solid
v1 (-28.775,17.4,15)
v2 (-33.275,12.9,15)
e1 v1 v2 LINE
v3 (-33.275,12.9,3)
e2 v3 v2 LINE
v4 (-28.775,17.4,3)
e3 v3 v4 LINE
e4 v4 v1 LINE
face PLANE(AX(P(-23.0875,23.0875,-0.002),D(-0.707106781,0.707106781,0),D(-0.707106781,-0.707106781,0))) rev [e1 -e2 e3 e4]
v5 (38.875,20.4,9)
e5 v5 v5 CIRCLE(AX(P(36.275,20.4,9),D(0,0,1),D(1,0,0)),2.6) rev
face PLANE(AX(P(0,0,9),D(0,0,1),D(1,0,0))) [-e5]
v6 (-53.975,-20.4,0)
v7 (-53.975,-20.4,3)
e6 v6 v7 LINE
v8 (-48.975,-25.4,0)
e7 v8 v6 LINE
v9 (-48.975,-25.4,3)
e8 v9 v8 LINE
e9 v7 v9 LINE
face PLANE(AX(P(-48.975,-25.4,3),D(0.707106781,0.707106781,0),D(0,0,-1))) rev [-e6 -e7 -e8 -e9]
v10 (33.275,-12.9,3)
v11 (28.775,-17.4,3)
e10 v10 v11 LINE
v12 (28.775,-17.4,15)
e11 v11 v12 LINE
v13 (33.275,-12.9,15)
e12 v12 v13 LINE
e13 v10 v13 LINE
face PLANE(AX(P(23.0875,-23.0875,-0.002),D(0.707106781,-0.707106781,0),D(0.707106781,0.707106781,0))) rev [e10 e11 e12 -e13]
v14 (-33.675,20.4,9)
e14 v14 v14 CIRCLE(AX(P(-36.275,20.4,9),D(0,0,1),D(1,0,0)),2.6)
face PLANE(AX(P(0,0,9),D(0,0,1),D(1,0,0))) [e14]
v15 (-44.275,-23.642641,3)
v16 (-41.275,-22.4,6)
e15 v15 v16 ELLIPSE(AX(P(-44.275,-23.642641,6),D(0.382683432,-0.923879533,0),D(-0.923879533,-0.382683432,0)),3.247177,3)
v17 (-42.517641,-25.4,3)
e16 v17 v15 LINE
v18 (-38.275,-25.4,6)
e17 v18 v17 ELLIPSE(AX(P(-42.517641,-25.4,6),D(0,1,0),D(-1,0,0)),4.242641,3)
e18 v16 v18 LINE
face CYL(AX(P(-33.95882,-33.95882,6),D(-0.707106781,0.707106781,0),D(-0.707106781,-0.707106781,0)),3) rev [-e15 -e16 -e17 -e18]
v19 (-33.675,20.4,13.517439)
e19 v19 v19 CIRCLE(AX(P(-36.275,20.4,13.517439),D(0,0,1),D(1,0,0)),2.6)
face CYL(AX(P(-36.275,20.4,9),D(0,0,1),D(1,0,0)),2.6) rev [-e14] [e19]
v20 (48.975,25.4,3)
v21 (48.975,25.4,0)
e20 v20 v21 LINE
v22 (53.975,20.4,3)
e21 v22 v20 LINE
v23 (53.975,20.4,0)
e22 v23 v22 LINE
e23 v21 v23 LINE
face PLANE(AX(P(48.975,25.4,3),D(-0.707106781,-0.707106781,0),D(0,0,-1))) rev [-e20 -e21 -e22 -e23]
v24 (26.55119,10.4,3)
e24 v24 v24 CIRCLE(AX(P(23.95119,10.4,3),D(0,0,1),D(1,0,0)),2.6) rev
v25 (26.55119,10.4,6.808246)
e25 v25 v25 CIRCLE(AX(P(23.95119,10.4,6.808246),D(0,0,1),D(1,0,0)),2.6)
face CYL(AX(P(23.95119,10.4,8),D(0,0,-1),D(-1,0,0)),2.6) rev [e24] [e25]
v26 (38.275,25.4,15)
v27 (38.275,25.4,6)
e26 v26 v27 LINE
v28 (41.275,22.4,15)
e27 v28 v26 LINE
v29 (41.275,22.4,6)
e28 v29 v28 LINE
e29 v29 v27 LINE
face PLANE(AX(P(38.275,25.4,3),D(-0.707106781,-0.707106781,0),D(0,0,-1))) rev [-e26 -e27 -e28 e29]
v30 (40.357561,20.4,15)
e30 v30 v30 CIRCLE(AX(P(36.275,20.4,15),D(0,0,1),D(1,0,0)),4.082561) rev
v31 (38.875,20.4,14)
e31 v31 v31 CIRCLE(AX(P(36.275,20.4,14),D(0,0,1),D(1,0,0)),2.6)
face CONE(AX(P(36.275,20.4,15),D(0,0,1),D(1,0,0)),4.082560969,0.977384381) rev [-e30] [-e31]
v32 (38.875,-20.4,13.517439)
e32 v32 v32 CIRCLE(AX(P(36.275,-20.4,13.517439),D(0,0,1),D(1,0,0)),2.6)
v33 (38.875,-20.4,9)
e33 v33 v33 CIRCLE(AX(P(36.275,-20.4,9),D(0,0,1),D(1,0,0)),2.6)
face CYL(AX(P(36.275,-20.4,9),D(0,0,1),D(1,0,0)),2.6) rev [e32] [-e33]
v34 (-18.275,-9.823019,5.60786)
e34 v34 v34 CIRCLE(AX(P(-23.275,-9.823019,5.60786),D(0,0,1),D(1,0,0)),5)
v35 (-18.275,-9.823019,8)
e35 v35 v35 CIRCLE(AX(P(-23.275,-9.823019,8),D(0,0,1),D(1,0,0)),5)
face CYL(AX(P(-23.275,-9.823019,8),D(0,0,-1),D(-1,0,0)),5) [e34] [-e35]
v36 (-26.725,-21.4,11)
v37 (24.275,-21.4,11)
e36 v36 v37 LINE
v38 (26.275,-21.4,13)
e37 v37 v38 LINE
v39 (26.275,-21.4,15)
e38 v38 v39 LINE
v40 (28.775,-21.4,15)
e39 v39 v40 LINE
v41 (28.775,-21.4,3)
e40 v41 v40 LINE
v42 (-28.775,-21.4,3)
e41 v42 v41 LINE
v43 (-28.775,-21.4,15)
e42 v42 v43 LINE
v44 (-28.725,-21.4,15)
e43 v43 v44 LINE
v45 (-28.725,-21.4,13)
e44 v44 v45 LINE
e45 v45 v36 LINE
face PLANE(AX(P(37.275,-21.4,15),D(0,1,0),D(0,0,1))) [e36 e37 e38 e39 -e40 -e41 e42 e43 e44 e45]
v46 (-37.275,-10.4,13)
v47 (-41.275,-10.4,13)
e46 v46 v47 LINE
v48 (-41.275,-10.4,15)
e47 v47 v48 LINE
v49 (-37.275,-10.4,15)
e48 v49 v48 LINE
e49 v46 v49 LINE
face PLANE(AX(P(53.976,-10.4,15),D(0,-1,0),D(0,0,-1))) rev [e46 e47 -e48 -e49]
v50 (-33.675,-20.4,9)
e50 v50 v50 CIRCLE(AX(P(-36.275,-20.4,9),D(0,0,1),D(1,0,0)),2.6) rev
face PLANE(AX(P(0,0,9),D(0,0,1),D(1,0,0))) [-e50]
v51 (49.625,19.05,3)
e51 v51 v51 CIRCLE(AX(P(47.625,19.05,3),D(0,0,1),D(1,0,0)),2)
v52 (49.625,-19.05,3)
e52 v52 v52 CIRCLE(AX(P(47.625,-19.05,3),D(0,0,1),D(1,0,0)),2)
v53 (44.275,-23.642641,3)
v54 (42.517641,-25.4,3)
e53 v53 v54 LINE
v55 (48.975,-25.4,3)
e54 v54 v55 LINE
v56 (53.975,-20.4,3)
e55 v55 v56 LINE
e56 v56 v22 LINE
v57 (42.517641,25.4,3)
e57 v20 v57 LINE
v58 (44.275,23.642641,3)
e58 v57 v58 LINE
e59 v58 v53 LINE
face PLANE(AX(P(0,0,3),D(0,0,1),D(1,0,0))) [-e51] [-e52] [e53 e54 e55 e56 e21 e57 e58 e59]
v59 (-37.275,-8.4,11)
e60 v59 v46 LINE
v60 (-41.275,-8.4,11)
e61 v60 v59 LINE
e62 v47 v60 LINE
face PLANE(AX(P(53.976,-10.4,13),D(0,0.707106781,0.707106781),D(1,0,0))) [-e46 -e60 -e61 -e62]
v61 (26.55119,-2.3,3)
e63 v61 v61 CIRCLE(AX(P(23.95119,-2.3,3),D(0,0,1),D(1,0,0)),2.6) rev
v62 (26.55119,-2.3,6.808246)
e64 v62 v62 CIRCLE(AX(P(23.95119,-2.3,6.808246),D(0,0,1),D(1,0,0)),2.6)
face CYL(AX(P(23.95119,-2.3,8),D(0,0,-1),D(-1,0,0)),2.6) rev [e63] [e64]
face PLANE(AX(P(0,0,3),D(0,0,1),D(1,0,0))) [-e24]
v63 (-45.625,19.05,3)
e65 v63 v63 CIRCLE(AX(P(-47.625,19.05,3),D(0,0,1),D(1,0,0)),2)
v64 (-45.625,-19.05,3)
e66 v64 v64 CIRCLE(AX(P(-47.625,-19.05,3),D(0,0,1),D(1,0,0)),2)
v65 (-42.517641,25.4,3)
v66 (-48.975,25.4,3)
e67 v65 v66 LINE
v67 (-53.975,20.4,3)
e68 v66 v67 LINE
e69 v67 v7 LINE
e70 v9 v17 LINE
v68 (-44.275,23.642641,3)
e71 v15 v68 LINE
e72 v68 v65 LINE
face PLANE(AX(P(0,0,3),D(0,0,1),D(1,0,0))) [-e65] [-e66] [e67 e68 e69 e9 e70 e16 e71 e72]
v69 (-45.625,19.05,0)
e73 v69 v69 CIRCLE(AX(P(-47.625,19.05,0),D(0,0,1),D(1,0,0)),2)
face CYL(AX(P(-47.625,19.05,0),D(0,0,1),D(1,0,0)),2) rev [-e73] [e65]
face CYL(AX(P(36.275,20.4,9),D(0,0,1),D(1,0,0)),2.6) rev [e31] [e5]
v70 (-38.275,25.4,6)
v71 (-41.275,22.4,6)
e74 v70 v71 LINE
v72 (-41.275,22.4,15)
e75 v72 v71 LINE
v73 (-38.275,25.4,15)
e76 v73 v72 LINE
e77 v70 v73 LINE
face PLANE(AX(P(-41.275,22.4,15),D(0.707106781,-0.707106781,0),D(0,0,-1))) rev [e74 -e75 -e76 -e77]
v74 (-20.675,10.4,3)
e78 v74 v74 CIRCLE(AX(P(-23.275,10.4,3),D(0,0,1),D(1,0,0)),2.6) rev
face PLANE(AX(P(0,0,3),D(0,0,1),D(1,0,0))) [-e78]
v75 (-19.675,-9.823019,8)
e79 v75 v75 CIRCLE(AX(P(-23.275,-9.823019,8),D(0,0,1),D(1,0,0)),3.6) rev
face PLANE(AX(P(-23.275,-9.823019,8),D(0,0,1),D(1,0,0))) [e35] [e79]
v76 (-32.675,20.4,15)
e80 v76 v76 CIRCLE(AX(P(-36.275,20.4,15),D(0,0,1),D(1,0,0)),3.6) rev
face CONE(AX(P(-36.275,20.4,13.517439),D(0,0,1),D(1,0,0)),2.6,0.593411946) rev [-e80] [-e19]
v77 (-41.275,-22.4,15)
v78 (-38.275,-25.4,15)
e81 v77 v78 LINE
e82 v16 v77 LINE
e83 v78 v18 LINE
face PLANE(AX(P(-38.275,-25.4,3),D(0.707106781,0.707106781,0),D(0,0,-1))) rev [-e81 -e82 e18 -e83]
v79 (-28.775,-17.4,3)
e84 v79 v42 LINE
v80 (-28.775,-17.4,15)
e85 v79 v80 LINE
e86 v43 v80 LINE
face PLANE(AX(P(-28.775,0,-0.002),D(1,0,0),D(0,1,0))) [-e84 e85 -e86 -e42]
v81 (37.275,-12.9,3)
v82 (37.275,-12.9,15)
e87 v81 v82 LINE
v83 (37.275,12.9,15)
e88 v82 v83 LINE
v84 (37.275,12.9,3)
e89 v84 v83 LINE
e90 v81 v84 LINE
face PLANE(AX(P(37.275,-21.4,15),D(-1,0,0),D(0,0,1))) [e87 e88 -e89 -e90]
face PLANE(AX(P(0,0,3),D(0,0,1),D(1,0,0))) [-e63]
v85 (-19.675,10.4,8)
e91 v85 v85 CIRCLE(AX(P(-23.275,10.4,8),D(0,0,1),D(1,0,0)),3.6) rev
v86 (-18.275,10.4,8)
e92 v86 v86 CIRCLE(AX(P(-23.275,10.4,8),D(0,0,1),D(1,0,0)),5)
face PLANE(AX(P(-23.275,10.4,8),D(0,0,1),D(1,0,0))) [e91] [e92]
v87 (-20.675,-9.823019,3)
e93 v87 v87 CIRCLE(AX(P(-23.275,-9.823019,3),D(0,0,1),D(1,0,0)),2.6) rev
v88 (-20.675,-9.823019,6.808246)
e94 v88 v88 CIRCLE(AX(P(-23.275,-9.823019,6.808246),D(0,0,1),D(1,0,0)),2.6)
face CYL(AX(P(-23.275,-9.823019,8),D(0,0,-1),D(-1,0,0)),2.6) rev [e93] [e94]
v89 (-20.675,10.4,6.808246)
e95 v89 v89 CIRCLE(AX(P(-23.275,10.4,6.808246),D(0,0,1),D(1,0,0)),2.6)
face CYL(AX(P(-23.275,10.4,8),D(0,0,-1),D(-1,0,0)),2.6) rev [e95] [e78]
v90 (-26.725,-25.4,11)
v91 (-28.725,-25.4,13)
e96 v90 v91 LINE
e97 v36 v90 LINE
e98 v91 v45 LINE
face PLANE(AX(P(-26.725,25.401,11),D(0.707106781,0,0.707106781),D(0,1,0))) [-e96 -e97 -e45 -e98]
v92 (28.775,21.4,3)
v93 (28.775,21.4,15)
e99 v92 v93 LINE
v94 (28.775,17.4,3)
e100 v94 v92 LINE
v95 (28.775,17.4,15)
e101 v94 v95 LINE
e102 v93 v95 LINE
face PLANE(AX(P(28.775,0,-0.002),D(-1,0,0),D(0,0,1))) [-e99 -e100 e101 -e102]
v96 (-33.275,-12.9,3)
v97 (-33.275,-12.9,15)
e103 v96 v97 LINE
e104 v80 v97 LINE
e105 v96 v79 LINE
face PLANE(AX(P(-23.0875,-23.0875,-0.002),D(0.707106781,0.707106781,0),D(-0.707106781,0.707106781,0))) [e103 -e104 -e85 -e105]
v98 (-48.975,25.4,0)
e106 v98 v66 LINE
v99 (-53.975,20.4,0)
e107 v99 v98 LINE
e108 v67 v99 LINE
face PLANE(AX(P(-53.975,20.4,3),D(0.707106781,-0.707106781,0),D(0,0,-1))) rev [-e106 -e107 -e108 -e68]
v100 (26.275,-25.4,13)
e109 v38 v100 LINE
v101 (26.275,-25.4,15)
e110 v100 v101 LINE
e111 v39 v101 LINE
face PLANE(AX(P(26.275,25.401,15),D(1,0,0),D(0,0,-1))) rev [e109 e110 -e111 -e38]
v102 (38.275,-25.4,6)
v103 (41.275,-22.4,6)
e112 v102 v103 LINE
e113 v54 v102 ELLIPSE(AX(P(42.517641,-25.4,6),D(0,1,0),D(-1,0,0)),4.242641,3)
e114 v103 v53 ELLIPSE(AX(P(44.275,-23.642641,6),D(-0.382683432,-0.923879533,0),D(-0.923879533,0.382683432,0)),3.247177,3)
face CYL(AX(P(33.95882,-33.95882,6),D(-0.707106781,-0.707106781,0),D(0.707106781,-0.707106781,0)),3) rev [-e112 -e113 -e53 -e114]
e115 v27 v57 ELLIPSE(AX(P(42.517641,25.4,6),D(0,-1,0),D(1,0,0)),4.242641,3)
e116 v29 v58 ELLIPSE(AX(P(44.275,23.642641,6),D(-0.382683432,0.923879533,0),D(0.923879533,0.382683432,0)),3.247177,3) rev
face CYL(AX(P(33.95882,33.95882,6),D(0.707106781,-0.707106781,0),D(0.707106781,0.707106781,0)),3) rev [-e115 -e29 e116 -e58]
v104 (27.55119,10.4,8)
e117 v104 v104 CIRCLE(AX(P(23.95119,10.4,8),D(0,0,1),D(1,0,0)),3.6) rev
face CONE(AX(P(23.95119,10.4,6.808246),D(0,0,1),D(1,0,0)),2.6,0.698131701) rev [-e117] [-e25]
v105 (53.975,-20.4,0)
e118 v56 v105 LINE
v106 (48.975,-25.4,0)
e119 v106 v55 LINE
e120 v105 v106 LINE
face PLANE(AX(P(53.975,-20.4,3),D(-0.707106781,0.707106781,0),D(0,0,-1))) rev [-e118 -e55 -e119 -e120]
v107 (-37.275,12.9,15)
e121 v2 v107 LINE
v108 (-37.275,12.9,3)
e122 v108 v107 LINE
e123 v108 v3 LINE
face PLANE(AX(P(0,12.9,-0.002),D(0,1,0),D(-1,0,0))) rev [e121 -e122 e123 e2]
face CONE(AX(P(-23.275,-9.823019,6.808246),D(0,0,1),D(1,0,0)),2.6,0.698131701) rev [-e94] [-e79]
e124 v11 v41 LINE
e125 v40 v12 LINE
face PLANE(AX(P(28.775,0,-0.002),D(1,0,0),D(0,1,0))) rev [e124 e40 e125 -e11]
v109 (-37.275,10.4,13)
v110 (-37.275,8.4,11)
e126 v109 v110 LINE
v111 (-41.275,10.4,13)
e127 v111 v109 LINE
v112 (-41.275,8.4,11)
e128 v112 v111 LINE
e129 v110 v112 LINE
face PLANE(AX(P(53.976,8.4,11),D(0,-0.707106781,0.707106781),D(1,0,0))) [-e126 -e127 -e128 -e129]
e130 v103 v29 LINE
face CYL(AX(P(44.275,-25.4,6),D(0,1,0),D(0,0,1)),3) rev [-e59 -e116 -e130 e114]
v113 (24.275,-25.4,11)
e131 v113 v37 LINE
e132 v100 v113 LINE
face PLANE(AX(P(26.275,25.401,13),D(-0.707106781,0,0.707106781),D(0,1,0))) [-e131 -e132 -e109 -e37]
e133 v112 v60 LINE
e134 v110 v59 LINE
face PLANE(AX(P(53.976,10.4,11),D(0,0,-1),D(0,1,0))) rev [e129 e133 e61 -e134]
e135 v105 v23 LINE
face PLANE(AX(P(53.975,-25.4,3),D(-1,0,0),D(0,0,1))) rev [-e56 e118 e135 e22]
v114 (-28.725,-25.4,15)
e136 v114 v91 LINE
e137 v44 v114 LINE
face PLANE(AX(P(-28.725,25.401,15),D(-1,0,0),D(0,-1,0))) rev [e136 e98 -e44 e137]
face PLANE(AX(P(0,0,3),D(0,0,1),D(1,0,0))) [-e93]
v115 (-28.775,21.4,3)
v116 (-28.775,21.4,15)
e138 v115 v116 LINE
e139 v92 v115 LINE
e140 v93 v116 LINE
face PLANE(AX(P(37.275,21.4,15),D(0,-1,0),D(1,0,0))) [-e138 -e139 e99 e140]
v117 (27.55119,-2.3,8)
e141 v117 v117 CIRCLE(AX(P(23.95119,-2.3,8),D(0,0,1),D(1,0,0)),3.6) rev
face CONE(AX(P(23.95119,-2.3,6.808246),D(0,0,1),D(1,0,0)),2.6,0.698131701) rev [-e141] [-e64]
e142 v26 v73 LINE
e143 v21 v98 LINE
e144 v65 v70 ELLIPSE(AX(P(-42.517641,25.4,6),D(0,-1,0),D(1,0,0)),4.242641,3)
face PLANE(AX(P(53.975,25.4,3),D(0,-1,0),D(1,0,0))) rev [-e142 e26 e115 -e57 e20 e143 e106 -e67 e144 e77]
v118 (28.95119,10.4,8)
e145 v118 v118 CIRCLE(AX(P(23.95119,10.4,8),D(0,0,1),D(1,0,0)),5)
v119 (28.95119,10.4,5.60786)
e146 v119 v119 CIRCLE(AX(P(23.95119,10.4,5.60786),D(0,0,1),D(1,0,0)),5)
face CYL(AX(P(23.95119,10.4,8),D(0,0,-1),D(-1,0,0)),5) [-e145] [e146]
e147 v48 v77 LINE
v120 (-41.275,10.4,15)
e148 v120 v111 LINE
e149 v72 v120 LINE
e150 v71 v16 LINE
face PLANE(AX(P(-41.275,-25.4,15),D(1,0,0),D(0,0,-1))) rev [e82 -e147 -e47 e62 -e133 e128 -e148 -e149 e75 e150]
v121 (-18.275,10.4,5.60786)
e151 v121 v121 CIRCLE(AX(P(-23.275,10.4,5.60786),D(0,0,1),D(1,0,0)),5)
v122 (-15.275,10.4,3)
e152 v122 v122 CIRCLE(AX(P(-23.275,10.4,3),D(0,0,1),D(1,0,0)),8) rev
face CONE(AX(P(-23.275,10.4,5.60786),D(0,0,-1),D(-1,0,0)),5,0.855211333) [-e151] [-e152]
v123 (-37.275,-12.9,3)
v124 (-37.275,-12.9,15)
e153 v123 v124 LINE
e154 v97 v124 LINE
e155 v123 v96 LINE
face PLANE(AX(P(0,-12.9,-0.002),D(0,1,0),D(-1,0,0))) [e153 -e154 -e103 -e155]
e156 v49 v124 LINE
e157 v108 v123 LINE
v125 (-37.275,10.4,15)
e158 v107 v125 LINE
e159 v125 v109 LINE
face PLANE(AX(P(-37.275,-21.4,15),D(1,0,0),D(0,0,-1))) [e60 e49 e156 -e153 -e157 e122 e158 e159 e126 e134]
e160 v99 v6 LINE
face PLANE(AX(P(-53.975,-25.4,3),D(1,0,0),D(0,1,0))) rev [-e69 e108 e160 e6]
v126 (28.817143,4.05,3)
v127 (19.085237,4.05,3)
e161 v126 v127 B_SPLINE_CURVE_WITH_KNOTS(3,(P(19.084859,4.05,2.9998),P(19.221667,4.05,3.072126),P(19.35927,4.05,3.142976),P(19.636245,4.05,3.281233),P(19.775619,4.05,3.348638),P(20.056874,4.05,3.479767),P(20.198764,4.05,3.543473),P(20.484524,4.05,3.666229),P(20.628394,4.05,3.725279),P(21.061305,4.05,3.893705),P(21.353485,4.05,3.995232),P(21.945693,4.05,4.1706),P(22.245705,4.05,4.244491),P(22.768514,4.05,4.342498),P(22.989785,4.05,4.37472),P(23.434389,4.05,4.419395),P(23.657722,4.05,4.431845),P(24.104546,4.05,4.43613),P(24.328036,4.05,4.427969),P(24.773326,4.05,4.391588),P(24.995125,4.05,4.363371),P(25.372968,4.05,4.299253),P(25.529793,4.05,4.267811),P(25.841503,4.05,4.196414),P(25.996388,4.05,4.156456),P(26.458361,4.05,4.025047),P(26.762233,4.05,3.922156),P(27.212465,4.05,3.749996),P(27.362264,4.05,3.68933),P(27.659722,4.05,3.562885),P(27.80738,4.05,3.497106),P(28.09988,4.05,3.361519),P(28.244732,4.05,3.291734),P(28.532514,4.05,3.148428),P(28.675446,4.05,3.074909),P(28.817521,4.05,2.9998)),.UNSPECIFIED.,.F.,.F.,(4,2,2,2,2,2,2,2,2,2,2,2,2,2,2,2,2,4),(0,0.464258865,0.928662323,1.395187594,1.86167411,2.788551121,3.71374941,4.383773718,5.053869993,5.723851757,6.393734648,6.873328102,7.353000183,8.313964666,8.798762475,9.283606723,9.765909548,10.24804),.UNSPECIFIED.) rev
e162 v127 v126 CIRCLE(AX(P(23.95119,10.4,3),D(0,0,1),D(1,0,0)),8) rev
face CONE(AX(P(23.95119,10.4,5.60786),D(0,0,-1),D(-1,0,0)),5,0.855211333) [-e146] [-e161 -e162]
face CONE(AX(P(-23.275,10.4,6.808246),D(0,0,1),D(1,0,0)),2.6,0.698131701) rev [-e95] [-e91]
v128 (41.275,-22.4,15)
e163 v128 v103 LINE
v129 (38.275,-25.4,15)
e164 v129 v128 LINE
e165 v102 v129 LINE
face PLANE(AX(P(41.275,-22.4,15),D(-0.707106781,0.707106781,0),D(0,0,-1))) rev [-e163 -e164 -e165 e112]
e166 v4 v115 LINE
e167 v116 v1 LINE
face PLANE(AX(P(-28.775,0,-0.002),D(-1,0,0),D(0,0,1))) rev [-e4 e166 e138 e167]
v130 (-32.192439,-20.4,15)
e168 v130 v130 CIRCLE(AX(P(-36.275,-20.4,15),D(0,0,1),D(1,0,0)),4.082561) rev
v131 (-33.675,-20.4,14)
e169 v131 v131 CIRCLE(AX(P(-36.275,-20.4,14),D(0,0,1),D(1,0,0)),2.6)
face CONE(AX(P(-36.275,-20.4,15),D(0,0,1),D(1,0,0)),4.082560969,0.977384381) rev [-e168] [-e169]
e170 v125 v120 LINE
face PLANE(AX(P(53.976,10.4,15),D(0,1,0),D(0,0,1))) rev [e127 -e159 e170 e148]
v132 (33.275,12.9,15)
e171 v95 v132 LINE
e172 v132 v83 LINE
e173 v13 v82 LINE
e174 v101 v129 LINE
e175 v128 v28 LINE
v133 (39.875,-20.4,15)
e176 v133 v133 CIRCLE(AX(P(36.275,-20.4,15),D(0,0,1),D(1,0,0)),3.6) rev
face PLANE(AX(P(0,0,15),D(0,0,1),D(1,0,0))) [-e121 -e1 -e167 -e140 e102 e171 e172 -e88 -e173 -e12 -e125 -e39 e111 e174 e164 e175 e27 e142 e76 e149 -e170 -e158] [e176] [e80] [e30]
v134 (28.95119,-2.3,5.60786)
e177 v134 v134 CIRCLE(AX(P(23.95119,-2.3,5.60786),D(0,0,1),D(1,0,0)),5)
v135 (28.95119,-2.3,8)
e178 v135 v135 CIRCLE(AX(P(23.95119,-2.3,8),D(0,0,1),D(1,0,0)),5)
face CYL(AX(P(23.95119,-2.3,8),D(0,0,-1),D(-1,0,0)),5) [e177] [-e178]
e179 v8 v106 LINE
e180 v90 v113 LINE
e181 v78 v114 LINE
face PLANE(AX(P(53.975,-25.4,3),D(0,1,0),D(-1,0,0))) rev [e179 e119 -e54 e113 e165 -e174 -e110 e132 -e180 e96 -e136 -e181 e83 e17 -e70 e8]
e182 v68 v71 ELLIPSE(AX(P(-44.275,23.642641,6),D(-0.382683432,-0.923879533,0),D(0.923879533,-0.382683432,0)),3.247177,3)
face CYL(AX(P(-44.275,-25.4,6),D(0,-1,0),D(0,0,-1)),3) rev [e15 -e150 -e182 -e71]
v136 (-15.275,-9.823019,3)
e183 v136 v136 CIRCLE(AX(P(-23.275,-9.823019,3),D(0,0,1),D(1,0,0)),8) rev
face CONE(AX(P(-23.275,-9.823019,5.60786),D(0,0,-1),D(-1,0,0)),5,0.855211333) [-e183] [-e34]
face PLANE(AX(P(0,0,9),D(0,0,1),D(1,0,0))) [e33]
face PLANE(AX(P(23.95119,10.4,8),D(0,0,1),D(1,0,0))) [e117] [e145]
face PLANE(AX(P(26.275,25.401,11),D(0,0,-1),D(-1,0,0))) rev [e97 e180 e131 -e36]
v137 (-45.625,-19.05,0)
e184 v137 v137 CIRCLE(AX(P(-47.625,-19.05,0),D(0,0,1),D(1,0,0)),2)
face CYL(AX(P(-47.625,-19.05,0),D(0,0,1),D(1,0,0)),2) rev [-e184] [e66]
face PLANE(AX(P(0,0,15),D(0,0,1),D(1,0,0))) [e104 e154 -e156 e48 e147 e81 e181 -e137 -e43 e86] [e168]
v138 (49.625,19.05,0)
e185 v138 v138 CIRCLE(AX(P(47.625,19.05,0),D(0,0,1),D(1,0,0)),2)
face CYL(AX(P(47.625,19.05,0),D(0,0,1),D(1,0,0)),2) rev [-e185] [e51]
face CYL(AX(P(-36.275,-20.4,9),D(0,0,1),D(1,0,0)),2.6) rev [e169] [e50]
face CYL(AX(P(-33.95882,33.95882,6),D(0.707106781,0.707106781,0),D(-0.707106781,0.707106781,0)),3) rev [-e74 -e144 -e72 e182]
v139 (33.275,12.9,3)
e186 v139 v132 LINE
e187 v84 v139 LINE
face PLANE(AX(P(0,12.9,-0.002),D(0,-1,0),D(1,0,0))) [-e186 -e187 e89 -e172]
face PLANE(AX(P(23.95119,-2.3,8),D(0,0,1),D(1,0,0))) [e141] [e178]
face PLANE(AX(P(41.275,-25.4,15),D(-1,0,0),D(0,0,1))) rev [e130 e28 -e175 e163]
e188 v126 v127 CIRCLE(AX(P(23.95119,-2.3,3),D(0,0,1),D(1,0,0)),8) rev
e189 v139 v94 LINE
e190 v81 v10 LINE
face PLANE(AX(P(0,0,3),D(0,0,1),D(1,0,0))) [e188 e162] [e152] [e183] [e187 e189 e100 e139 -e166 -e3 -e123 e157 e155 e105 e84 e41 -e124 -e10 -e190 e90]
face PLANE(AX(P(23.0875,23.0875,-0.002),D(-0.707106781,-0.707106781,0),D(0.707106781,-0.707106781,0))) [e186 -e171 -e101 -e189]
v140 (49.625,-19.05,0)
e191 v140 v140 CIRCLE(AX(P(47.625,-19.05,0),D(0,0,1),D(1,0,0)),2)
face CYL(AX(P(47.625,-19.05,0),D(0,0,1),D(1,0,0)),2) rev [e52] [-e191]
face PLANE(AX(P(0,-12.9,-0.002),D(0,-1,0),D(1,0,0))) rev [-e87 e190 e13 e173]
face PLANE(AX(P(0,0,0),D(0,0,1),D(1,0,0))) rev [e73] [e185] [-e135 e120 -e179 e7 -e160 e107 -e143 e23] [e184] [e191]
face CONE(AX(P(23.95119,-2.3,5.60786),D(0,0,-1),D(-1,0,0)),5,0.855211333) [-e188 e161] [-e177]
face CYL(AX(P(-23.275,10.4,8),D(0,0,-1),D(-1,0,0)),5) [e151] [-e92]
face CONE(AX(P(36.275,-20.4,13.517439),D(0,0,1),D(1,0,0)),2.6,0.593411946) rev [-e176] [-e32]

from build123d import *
from OCP.BRepFilletAPI import BRepFilletAPI_MakeChamfer

# Parameters (mm, degrees)
SKETCH1_W           = 107.95
SKETCH1_H           = 50.8
BOSS_EXTRUDE1_DEPTH = 3
SKETCH2_W           = 82.55
SKETCH2_H           = 50.8
SKETCH2_W_2         = 74.55
SKETCH2_H_2         = 42.8
BOSS_EXTRUDE2_DEPTH = 12
SKETCH3_R           = 5
SKETCH3_R_2         = 2.6
BOSS_EXTRUDE3_DEPTH = 5
CUT_EXTRUDE1_REACH  = 77.624
SKETCH4_W           = 55
SKETCH4_H           = 4
CUT_EXTRUDE2_REACH  = 101.713
SKETCH5_W           = 4
SKETCH5_H           = 20.8
SKETCH6_R           = 2.5
BOSS_EXTRUDE4_DEPTH = 12
CHAMFER1_SIZE       = 3
CHAMFER2_SIZE       = 3
CHAMFER2_SIZE_2     = 2.607860213
CHAMFER3_SIZE       = 1
CHAMFER3_SIZE2      = 1.191753593
SKETCH7_R           = 2.6
CUT_EXTRUDE3_DEPTH  = 6
CHAMFER4_SIZE       = 2
SKETCH8_R           = 2
CUT_EXTRUDE4_DEPTH  = 61.847848154
CHAMFER5_SIZE       = 5
FILLET1_R           = 3
CHAMFER6_SIZE       = 1
CHAMFER6_SIZE2      = 1.482560969


with BuildPart() as part:
    # Sketch1 → Boss-Extrude1 (new body)
    with BuildSketch(Plane.XY):
        Rectangle(SKETCH1_W, SKETCH1_H)
    extrude(amount=BOSS_EXTRUDE1_DEPTH)

    # Sketch2 → Boss-Extrude2 (add)
    with BuildSketch(Plane.XY.offset(3)):
        Rectangle(SKETCH2_W, SKETCH2_H)
        Rectangle(SKETCH2_W_2, SKETCH2_H_2, mode=Mode.SUBTRACT)
    extrude(amount=BOSS_EXTRUDE2_DEPTH)

    # Sketch3 → Boss-Extrude3 (add)
    # profile 1 of 4: a face of its own
    with BuildSketch(Plane.XY.offset(3)):
        with Locations((-23.275, 10.4)):
            Circle(SKETCH3_R)
        with Locations((-23.275, 10.4)):
            Circle(SKETCH3_R_2, mode=Mode.SUBTRACT)
    # profile 2 of 4: a face of its own
    with BuildSketch(Plane.XY.offset(3)):
        with Locations((-23.275, -9.823019498)):
            Circle(SKETCH3_R)
        with Locations((-23.275, -9.823019498)):
            Circle(SKETCH3_R_2, mode=Mode.SUBTRACT)
    # profile 3 of 4: a face of its own
    with BuildSketch(Plane.XY.offset(3)):
        with Locations((23.951190028, 10.4)):
            Circle(SKETCH3_R)
        with Locations((23.951190028, 10.4)):
            Circle(SKETCH3_R_2, mode=Mode.SUBTRACT)
    # profile 4 of 4: a face of its own
    with BuildSketch(Plane.XY.offset(3)):
        with Locations((23.951190028, -2.3)):
            Circle(SKETCH3_R)
        with Locations((23.951190028, -2.3)):
            Circle(SKETCH3_R_2, mode=Mode.SUBTRACT)
    extrude(amount=BOSS_EXTRUDE3_DEPTH)

    # Sketch4 → Cut-Extrude1 (cut, up to next)
    with BuildSketch(Plane.XZ.offset(25.4), mode=Mode.PRIVATE) as cut_extrude1_sk1:
        with Locations((-1.225, 13)):
            Rectangle(SKETCH4_W, SKETCH4_H)
    cut_extrude1_tool1 = extrude(cut_extrude1_sk1.sketch, amount=-CUT_EXTRUDE1_REACH, mode=Mode.PRIVATE) & part.part
    add(cut_extrude1_tool1.solids().sort_by_distance((-1.225, -25.4, 13))[0], mode=Mode.SUBTRACT)

    # Sketch5 → Cut-Extrude2 (cut, up to next)
    with BuildSketch(Plane.ZY.offset(41.275), mode=Mode.PRIVATE) as cut_extrude2_sk1:
        with Locations((13, 0)):
            Rectangle(SKETCH5_W, SKETCH5_H)
    cut_extrude2_tool1 = extrude(cut_extrude2_sk1.sketch, amount=-CUT_EXTRUDE2_REACH, mode=Mode.PRIVATE) & part.part
    add(cut_extrude2_tool1.solids().sort_by_distance((-41.275, 0, 13))[0], mode=Mode.SUBTRACT)

    # Sketch6 → Boss-Extrude4 (add)
    with BuildSketch(Plane.XY.offset(15)):
        with BuildLine():
            Line((-33.275, 12.9), (-28.775, 17.4))
            Line((-28.775, 17.4), (-28.775, 21.4))
            Line((-28.775, 21.4), (-33.983712153, 21.4))
            ThreePointArc((-33.983712153, 21.4), (-33.827734218, 20.910774109), (-33.775, 20.4))
            ThreePointArc((-33.775, 20.4), (-34.905693606, 18.308349934), (-37.275, 18.108712153))
            Line((-37.275, 18.108712153), (-37.275, 12.9))
            Line((-37.275, 12.9), (-33.275, 12.9))
        make_face()
        with Locations((-36.275, -20.4)):
            Circle(SKETCH6_R)
        Polygon((-37.275, -12.9), (-37.275, -21.4), (-28.775, -21.4), (-28.775, -17.4), (-33.275, -12.9), align=None)
        with BuildLine():
            Line((37.275, -18.108712153), (37.275, -12.9))
            Line((37.275, -12.9), (33.275, -12.9))
            Line((33.275, -12.9), (28.775, -17.4))
            Line((28.775, -17.4), (28.775, -21.4))
            Line((28.775, -21.4), (33.983712153, -21.4))
            ThreePointArc((33.983712153, -21.4), (34.507233047, -18.632233047), (37.275, -18.108712153))
        make_face()
        with BuildLine():
            Line((33.983712153, 21.4), (28.775, 21.4))
            Line((28.775, 21.4), (28.775, 17.4))
            Line((28.775, 17.4), (33.275, 12.9))
            Line((33.275, 12.9), (37.275, 12.9))
            Line((37.275, 12.9), (37.275, 18.108712153))
            ThreePointArc((37.275, 18.108712153), (34.507233047, 18.632233047), (33.983712153, 21.4))
        make_face()
        with BuildLine():
            ThreePointArc((-33.775, 20.4), (-33.827734218, 20.910774109), (-33.983712153, 21.4))
            Line((-33.983712153, 21.4), (-37.275, 21.4))
            Line((-37.275, 21.4), (-37.275, 18.108712153))
            ThreePointArc((-37.275, 18.108712153), (-34.905693606, 18.308349934), (-33.775, 20.4))
        make_face()
        with BuildLine():
            Line((-37.275, 21.4), (-33.983712153, 21.4))
            ThreePointArc((-33.983712153, 21.4), (-38.042766953, 22.167766953), (-37.275, 18.108712153))
            Line((-37.275, 18.108712153), (-37.275, 21.4))
        make_face()
        with BuildLine():
            ThreePointArc((-37.275, -18.108712153), (-38.042766953, -22.167766953), (-33.983712153, -21.4))
            Line((-33.983712153, -21.4), (-37.275, -21.4))
            Line((-37.275, -21.4), (-37.275, -18.108712153))
        make_face()
        with BuildLine():
            Line((-37.275, -21.4), (-33.983712153, -21.4))
            ThreePointArc((-33.983712153, -21.4), (-33.827734218, -20.910774109), (-33.775, -20.4))
            ThreePointArc((-33.775, -20.4), (-34.905693606, -18.308349934), (-37.275, -18.108712153))
            Line((-37.275, -18.108712153), (-37.275, -21.4))
        make_face()
        with BuildLine():
            ThreePointArc((38.775, 20.4), (36.785774109, 22.847265782), (33.983712153, 21.4))
            Line((33.983712153, 21.4), (37.275, 21.4))
            Line((37.275, 21.4), (37.275, 18.108712153))
            ThreePointArc((37.275, 18.108712153), (38.366650066, 19.030693606), (38.775, 20.4))
        make_face()
        with BuildLine():
            Line((37.275, 21.4), (33.983712153, 21.4))
            ThreePointArc((33.983712153, 21.4), (34.507233047, 18.632233047), (37.275, 18.108712153))
            Line((37.275, 18.108712153), (37.275, 21.4))
        make_face()
        with BuildLine():
            ThreePointArc((38.775, -20.4), (38.366650066, -19.030693606), (37.275, -18.108712153))
            Line((37.275, -18.108712153), (37.275, -21.4))
            Line((37.275, -21.4), (33.983712153, -21.4))
            ThreePointArc((33.983712153, -21.4), (36.785774109, -22.847265782), (38.775, -20.4))
        make_face()
        with BuildLine():
            Line((37.275, -21.4), (37.275, -18.108712153))
            ThreePointArc((37.275, -18.108712153), (34.507233047, -18.632233047), (33.983712153, -21.4))
            Line((33.983712153, -21.4), (37.275, -21.4))
        make_face()
    extrude(amount=-BOSS_EXTRUDE4_DEPTH)

    # Chamfer1
    chamfer1_edges = [part.edges().sort_by_distance(p)[0] for p in [
        (-41.275, 25.4, 9),
        (-41.275, -25.4, 9),
        (41.275, -25.4, 9),
        (41.275, 25.4, 9),
    ]]
    chamfer(chamfer1_edges, length=CHAMFER1_SIZE)

    # Chamfer2
    # the kernel refuses this chamfer: 3, 2.607860213 mm, written as the material it adds along each edge
    with BuildSketch(Plane(origin=(-23.275, 10.4, 3), x_dir=(1, 0, 0), z_dir=(0, -1, 0))) as chamfer2_piece_1:
        Polygon((5 + CHAMFER2_SIZE, 0), (5, CHAMFER2_SIZE_2), (5, 0), align=None)
    revolve(axis=Axis((-23.275, 10.4, 3), (0, 0, 1)))
    with BuildSketch(Plane(origin=(-23.275, -9.823019498, 3), x_dir=(1, 0, 0), z_dir=(0, -1, 0))) as chamfer2_piece_2:
        Polygon((5 + CHAMFER2_SIZE, 0), (5, CHAMFER2_SIZE_2), (5, 0), align=None)
    revolve(axis=Axis((-23.275, -9.823019498, 3), (0, 0, 1)))
    with BuildSketch(Plane(origin=(23.951190028, 10.4, 3), x_dir=(1, 0, 0), z_dir=(0, -1, 0))) as chamfer2_piece_3:
        Polygon((5 + CHAMFER2_SIZE, 0), (5, CHAMFER2_SIZE_2), (5, 0), align=None)
    revolve(axis=Axis((23.951190028, 10.4, 3), (0, 0, 1)))
    with BuildSketch(Plane(origin=(23.951190028, -2.3, 3), x_dir=(1, 0, 0), z_dir=(0, -1, 0))) as chamfer2_piece_4:
        Polygon((5 + CHAMFER2_SIZE, 0), (5, CHAMFER2_SIZE_2), (5, 0), align=None)
    revolve(axis=Axis((23.951190028, -2.3, 3), (0, 0, 1)))

    # Chamfer3: one chamfer whose edges measure the first distance from different faces: ONE call of the kernel's chamfer builder (chamfer() names one face for all edges)
    chamfer3_edges_1 = [part.edges().sort_by_distance(p)[0] for p in [
        (-25.875, 10.4, 8),
    ]]
    chamfer3_side_1 = [part.faces().sort_by_distance(p)[0] for p in [
        (-28.133578644, 10.4, 8),
    ]]
    chamfer3_edges_2 = [part.edges().sort_by_distance(p)[0] for p in [
        (-25.875, -9.823019498, 8),
    ]]
    chamfer3_side_2 = [part.faces().sort_by_distance(p)[0] for p in [
        (-28.133578644, -9.823019498, 8),
    ]]
    chamfer3_edges_3 = [part.edges().sort_by_distance(p)[0] for p in [
        (21.351190028, 10.4, 8),
    ]]
    chamfer3_side_3 = [part.faces().sort_by_distance(p)[0] for p in [
        (19.092611384, 10.4, 8),
    ]]
    chamfer3_edges_4 = [part.edges().sort_by_distance(p)[0] for p in [
        (21.351190028, -2.3, 8),
    ]]
    chamfer3_side_4 = [part.faces().sort_by_distance(p)[0] for p in [
        (19.092611384, -2.3, 8),
    ]]
    chamfer3 = BRepFilletAPI_MakeChamfer(part.part.solid().wrapped)
    for e in chamfer3_edges_1:
        chamfer3.Add(CHAMFER3_SIZE, CHAMFER3_SIZE2, e.wrapped, chamfer3_side_1[0].wrapped)  # the first distance lies on this face
    for e in chamfer3_edges_2:
        chamfer3.Add(CHAMFER3_SIZE, CHAMFER3_SIZE2, e.wrapped, chamfer3_side_2[0].wrapped)  # the first distance lies on this face
    for e in chamfer3_edges_3:
        chamfer3.Add(CHAMFER3_SIZE, CHAMFER3_SIZE2, e.wrapped, chamfer3_side_3[0].wrapped)  # the first distance lies on this face
    for e in chamfer3_edges_4:
        chamfer3.Add(CHAMFER3_SIZE, CHAMFER3_SIZE2, e.wrapped, chamfer3_side_4[0].wrapped)  # the first distance lies on this face
    add(Compound.cast(chamfer3.Shape()), mode=Mode.REPLACE)

    # Sketch7 → Cut-Extrude3 (cut)
    with BuildSketch(Plane.XY.offset(15)):
        with Locations((-36.275, 20.4)):
            Circle(SKETCH7_R)
        with Locations((-36.275, -20.4)):
            Circle(SKETCH7_R)
        with Locations((36.275, 20.4)):
            Circle(SKETCH7_R)
        with Locations((36.275, -20.4)):
            Circle(SKETCH7_R)
    extrude(amount=-CUT_EXTRUDE3_DEPTH, mode=Mode.SUBTRACT)

    # Chamfer4
    chamfer4_edges = [part.edges().sort_by_distance(p)[0] for p in [
        (26.275, -23.4, 11),
        (-28.725, -23.4, 11),
        (-39.275, 10.4, 11),
        (-39.275, -10.4, 11),
    ]]
    chamfer(chamfer4_edges, length=CHAMFER4_SIZE)

    # Sketch8 → Cut-Extrude4 (cut, through all)
    with BuildSketch(Plane.XY.offset(3)):
        with Locations((-47.625, 19.05)):
            Circle(SKETCH8_R)
        with Locations((-47.625, -19.05)):
            Circle(SKETCH8_R)
        with Locations((47.625, 19.05)):
            Circle(SKETCH8_R)
        with Locations((47.625, -19.05)):
            Circle(SKETCH8_R)
    extrude(amount=-CUT_EXTRUDE4_DEPTH, mode=Mode.SUBTRACT)

    # Chamfer5
    chamfer5_edges = [part.edges().sort_by_distance(p)[0] for p in [
        (-53.975, 25.4, 1.5),
        (53.975, 25.4, 1.5),
        (53.975, -25.4, 1.5),
        (-53.975, -25.4, 1.5),
    ]]
    chamfer(chamfer5_edges, length=CHAMFER5_SIZE)

    # Fillet1
    fillet1_edges = [part.edges().sort_by_distance(p)[0] for p in [
        (-41.275, 0, 3),
        (41.275, 0, 3),
        (-39.775, 23.9, 3),
        (39.775, 23.9, 3),
        (39.775, -23.9, 3),
        (-39.775, -23.9, 3),
    ]]
    fillet(fillet1_edges, radius=FILLET1_R)

    # Chamfer6: one chamfer whose edges measure the first distance from different faces: ONE call of the kernel's chamfer builder (chamfer() names one face for all edges)
    chamfer6_edges_1 = [part.edges().sort_by_distance(p)[0] for p in [
        (-38.875, -20.4, 15),
    ]]
    chamfer6_side_1 = [part.faces().sort_by_distance(p)[0] for p in [
        (-38.875, -20.4, 12),
    ]]
    chamfer6_edges_2 = [part.edges().sort_by_distance(p)[0] for p in [
        (33.675, 20.4, 15),
    ]]
    chamfer6_side_2 = [part.faces().sort_by_distance(p)[0] for p in [
        (33.675, 20.4, 12),
    ]]
    chamfer6_edges_3 = [part.edges().sort_by_distance(p)[0] for p in [
        (33.675, -20.4, 15),
        (-38.875, 20.4, 15),
    ]]
    chamfer6_side_3 = [part.faces().sort_by_distance(p)[0] for p in [
        (-40.305714567, 16.4, 15),
    ]]
    chamfer6 = BRepFilletAPI_MakeChamfer(part.part.solid().wrapped)
    for e in chamfer6_edges_1:
        chamfer6.Add(CHAMFER6_SIZE, CHAMFER6_SIZE2, e.wrapped, chamfer6_side_1[0].wrapped)  # the first distance lies on this face
    for e in chamfer6_edges_2:
        chamfer6.Add(CHAMFER6_SIZE, CHAMFER6_SIZE2, e.wrapped, chamfer6_side_2[0].wrapped)  # the first distance lies on this face
    for e in chamfer6_edges_3:
        chamfer6.Add(CHAMFER6_SIZE, CHAMFER6_SIZE2, e.wrapped, chamfer6_side_3[0].wrapped)  # the first distance lies on this face
    add(Compound.cast(chamfer6.Shape()), mode=Mode.REPLACE)


solid = part.part
